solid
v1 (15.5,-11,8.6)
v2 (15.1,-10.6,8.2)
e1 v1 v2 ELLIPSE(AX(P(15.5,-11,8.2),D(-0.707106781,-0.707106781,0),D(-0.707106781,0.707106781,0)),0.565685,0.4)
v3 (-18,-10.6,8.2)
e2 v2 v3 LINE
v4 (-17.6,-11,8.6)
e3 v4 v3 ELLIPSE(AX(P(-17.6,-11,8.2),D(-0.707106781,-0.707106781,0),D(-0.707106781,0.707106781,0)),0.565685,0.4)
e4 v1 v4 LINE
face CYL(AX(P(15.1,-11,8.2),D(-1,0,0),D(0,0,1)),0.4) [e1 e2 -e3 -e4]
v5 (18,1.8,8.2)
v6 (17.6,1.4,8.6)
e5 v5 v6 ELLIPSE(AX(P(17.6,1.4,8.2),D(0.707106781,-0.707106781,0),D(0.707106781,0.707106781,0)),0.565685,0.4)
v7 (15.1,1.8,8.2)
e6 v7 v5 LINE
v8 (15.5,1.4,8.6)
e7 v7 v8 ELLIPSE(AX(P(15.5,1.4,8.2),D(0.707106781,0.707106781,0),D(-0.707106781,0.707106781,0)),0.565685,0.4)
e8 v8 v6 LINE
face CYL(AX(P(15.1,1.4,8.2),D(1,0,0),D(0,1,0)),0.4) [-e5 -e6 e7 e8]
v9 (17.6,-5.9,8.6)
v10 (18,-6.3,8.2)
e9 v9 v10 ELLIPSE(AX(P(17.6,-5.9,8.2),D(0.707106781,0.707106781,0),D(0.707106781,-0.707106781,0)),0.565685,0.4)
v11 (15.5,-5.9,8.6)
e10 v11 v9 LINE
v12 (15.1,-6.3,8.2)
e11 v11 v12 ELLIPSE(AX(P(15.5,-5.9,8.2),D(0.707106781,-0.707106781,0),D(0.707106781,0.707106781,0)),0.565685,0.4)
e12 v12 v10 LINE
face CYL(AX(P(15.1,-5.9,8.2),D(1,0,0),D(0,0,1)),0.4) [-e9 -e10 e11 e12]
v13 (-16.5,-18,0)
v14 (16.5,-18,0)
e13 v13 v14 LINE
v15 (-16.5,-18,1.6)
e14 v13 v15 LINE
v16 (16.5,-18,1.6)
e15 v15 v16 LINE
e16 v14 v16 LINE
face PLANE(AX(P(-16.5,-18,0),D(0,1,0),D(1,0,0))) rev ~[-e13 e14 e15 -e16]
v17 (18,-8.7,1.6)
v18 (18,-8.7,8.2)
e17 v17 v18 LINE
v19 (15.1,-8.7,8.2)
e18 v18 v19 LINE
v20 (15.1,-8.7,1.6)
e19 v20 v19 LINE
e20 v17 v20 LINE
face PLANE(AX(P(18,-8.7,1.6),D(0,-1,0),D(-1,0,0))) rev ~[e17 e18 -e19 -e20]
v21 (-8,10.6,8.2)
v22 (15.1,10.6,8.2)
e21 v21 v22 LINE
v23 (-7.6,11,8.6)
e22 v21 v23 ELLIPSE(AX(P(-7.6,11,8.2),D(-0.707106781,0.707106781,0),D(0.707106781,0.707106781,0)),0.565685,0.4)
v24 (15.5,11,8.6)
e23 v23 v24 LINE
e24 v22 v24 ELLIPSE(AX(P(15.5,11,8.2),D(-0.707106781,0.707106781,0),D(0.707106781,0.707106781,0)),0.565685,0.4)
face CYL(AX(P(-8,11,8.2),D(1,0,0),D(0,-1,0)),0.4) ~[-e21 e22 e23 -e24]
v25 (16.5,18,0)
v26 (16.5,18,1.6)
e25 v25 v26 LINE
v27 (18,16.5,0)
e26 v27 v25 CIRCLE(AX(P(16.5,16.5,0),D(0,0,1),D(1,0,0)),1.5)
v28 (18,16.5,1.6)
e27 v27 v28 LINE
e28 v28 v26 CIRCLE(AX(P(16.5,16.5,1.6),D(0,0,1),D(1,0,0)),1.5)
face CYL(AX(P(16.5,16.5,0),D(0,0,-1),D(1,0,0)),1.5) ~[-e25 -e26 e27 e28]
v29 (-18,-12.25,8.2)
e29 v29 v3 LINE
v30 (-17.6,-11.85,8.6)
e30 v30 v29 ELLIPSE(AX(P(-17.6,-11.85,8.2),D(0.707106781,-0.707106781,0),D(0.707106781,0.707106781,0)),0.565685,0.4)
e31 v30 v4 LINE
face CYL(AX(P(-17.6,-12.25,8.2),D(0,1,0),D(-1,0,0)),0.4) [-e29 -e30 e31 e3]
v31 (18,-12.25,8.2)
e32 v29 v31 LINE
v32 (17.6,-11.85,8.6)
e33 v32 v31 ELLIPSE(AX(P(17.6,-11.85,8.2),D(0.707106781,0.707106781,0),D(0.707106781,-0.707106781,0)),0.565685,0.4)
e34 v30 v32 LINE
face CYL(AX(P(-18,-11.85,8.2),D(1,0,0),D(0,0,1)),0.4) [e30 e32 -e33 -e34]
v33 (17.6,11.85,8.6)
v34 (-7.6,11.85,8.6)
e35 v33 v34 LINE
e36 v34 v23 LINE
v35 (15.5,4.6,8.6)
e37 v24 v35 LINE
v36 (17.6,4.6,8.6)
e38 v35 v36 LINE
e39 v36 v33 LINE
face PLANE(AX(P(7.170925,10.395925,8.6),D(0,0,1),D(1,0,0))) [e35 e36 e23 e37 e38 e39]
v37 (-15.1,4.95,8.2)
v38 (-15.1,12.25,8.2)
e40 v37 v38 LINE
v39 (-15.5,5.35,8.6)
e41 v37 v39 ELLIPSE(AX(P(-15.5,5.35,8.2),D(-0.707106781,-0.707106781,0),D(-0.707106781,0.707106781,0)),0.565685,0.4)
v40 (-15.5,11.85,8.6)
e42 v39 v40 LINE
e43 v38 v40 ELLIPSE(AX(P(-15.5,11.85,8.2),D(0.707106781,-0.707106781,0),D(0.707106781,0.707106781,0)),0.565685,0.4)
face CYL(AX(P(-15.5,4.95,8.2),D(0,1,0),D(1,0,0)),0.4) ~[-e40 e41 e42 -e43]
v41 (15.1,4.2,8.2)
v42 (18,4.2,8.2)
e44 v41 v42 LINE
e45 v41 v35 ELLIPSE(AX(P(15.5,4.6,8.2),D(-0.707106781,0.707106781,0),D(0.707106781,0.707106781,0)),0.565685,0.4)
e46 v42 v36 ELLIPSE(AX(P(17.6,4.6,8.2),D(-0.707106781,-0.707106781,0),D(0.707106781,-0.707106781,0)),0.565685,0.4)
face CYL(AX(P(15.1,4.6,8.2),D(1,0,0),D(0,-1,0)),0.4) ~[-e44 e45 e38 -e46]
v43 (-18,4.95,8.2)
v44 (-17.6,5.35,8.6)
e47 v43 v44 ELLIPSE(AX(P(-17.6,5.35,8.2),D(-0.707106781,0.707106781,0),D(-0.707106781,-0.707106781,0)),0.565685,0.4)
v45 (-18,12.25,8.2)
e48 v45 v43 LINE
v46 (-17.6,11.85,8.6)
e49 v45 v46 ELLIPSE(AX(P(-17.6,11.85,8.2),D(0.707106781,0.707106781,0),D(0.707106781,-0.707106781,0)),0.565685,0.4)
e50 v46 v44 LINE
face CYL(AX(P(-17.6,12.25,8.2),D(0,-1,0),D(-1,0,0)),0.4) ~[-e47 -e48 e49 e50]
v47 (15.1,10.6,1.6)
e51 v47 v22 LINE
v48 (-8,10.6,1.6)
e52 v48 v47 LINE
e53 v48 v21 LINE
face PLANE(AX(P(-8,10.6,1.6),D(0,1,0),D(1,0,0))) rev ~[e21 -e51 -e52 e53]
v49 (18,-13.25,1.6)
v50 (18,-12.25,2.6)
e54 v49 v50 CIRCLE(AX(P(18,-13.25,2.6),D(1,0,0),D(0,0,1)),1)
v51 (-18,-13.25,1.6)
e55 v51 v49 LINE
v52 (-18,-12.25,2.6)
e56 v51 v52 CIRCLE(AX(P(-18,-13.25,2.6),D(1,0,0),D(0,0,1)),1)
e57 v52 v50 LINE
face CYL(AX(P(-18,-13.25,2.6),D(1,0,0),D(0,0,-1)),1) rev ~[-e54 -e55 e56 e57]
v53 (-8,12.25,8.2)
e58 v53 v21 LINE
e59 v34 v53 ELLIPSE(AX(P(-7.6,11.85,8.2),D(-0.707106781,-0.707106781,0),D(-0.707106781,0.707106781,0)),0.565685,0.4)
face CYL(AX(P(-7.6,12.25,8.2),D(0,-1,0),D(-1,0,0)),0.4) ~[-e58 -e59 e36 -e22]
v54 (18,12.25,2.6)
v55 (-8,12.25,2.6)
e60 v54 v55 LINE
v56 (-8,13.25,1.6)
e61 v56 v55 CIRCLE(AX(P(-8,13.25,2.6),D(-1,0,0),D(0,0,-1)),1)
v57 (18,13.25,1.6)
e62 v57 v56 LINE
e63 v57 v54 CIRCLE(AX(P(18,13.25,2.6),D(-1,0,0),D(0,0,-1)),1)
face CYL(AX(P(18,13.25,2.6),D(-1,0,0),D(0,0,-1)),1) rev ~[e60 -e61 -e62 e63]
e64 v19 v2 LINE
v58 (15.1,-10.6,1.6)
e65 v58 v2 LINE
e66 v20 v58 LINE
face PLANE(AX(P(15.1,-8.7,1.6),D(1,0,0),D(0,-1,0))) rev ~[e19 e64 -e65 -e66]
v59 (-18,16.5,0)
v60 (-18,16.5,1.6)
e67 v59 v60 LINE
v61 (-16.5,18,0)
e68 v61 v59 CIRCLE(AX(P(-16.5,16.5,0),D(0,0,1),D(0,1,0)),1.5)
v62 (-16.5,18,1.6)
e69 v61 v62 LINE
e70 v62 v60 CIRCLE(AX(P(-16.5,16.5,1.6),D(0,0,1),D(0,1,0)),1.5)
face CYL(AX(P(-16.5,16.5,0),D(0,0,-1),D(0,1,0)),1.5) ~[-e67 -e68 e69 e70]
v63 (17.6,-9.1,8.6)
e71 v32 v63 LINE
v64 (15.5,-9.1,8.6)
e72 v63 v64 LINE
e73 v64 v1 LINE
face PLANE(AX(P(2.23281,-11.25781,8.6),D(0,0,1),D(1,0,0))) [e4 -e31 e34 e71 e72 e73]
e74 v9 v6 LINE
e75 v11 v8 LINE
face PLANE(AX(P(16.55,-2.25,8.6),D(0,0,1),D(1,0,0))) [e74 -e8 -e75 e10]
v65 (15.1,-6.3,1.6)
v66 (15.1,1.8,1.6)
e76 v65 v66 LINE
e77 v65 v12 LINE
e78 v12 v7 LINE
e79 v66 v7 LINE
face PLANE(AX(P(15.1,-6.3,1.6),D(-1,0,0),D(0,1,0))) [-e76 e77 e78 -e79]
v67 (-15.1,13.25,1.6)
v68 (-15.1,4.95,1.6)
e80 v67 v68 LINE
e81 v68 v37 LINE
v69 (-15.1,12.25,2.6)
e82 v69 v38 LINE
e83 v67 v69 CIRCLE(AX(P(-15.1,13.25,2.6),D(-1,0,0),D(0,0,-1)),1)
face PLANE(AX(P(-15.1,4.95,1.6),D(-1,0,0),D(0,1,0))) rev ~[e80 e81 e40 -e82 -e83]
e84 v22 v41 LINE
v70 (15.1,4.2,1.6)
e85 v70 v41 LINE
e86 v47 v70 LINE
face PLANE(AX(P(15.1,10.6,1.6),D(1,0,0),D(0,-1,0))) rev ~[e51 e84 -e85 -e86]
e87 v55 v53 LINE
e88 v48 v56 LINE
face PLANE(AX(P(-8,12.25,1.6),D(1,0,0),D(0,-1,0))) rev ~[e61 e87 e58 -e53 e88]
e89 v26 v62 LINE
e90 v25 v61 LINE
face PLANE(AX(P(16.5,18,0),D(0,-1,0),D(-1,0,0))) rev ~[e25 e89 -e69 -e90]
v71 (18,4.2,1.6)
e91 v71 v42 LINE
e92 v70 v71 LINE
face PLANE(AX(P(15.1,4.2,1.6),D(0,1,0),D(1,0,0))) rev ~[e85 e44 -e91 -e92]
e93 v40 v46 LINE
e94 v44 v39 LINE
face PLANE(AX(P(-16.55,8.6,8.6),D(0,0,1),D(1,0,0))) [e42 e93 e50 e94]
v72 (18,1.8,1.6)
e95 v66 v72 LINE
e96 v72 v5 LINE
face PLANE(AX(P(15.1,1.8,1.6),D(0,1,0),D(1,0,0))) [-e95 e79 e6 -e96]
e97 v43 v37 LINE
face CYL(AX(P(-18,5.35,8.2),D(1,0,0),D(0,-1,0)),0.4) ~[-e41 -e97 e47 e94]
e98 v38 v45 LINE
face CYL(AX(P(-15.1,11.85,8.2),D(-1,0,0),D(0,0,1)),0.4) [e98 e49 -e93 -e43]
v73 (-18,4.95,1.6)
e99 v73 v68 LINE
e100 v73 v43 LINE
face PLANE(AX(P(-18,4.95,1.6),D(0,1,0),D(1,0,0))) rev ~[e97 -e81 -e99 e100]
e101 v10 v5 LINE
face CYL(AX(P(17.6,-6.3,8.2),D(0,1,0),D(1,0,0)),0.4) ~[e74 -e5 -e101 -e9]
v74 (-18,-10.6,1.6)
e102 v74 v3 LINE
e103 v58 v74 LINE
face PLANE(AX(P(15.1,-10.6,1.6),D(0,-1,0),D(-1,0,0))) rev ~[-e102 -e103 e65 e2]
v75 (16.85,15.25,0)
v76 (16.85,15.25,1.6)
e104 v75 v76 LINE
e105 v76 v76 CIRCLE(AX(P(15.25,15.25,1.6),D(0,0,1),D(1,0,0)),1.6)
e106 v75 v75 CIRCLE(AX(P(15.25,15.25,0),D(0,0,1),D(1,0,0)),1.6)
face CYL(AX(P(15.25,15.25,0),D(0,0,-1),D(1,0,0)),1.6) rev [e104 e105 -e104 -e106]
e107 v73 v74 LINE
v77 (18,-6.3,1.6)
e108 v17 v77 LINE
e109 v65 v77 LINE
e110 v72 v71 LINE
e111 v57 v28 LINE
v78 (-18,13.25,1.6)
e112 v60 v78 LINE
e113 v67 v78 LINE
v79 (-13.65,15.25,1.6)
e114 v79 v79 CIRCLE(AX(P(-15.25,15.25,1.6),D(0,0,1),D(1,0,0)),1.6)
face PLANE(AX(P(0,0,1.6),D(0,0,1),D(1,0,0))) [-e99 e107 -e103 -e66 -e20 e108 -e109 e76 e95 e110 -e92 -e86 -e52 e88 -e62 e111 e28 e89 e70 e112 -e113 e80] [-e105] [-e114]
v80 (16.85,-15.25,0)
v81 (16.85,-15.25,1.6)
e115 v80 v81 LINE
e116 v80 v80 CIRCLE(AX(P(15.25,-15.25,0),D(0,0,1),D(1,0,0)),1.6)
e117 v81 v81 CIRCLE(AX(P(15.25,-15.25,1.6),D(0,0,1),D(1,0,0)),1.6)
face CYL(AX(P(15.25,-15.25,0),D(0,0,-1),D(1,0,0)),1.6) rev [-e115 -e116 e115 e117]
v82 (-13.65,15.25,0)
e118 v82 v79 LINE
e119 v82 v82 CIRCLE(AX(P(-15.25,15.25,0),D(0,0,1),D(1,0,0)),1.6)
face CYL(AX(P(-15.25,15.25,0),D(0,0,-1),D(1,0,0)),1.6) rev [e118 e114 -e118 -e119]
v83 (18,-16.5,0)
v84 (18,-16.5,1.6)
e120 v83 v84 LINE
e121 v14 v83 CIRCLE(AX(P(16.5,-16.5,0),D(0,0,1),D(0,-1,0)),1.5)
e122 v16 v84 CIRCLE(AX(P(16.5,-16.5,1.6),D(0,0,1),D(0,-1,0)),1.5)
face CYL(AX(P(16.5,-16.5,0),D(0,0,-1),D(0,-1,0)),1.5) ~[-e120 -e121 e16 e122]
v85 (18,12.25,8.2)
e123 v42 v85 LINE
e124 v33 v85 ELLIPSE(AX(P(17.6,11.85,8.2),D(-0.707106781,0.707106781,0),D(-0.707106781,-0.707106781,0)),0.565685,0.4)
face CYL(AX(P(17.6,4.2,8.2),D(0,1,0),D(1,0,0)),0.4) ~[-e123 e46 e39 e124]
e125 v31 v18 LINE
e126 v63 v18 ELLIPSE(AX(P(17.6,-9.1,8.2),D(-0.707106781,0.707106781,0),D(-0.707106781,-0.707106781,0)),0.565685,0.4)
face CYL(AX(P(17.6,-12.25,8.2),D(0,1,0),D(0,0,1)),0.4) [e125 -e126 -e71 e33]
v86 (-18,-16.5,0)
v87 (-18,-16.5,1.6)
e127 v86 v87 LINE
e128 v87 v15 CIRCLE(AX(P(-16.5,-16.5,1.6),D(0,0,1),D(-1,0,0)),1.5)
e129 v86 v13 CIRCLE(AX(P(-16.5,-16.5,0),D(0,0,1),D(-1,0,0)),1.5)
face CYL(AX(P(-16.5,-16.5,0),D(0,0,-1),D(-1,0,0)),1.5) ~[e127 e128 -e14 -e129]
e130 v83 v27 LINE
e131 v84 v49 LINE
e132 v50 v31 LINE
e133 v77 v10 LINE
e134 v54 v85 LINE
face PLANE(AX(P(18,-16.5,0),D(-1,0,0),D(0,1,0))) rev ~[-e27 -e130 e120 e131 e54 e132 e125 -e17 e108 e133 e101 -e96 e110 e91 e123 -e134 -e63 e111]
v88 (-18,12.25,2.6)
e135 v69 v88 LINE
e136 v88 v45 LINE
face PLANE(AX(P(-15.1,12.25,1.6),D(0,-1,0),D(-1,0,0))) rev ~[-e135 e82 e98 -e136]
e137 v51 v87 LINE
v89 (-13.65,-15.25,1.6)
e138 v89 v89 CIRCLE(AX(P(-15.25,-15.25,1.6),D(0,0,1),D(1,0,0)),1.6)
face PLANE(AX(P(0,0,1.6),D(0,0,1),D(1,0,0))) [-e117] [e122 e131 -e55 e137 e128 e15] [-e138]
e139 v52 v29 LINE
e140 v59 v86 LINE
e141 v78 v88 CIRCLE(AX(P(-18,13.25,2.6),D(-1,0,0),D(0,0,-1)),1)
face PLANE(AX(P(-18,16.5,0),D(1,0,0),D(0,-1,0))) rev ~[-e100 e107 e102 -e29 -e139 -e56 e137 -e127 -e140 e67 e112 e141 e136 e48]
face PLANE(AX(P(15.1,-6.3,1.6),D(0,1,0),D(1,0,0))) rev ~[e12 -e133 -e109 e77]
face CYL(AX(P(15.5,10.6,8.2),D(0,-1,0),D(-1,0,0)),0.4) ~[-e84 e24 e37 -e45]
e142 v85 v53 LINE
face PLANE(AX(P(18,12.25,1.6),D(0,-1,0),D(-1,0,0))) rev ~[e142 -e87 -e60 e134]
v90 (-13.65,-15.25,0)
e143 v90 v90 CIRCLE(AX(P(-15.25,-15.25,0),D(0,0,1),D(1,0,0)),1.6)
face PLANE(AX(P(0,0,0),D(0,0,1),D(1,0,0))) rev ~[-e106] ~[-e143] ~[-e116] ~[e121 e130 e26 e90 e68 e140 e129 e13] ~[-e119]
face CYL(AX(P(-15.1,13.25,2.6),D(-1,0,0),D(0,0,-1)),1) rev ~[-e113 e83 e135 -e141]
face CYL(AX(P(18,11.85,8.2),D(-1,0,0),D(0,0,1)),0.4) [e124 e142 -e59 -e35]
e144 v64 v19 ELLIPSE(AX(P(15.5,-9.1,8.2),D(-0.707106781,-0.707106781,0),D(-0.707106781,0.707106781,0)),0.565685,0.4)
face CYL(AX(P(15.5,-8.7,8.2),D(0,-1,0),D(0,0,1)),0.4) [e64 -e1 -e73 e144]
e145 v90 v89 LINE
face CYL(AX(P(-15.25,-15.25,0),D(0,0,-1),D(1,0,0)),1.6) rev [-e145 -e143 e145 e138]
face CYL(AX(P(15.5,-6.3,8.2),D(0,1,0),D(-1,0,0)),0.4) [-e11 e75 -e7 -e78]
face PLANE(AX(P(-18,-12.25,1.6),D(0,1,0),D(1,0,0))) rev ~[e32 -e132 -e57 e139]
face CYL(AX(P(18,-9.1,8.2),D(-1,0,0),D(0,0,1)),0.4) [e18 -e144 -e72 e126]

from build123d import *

# Parameters (mm, degrees)
F0_R     = 1.6
F1_DEPTH = 1.6
F2_W     = 2.9
F2_H     = 8.1
F2_H_2   = 1.65
F3_DEPTH = 7
F4_R     = 1
F5_R     = 0.4


with BuildPart() as f1:
    # F0 (on Top) → F1 (new body)
    with BuildSketch(Plane.XY):
        with BuildLine():
            ThreePointArc((-18, -16.5), (-17.5606601718, -17.5606601718), (-16.5, -18))
            Line((-16.5, -18), (16.5, -18))
            ThreePointArc((16.5, -18), (17.5606601718, -17.5606601718), (18, -16.5))
            Line((18, -16.5), (18, 16.5))
            ThreePointArc((18, 16.5), (17.5606601718, 17.5606601718), (16.5, 18))
            Line((16.5, 18), (-16.5, 18))
            ThreePointArc((-16.5, 18), (-17.5606601718, 17.5606601718), (-18, 16.5))
            Line((-18, 16.5), (-18, -16.5))
        make_face()
        with Locations((-15.25, -15.25)):
            Circle(F0_R, mode=Mode.SUBTRACT)
        with Locations((15.25, -15.25)):
            Circle(F0_R, mode=Mode.SUBTRACT)
        with Locations((-15.25, 15.25)):
            Circle(F0_R, mode=Mode.SUBTRACT)
        with Locations((15.25, 15.25)):
            Circle(F0_R, mode=Mode.SUBTRACT)
    extrude(amount=F1_DEPTH)

    # F2 (on face) → F3 (join)
    with BuildSketch(Plane.XY.offset(1.6)):
        Polygon((15.1, -10.6), (-15.1, -10.6), (-15.1, -12.25), (18, -12.25), (18, -8.7), (15.1, -8.7), align=None)
        with Locations((16.55, -2.25)):
            Rectangle(F2_W, F2_H)
        Polygon((-8, 12.25), (-8, 10.6), (15.1, 10.6), (15.1, 4.2), (18, 4.2), (18, 12.25), align=None)
        Polygon((-18, 4.95), (-15.1, 4.95), (-15.1, 10.6), (-15.1, 12.25), (-18, 12.25), align=None)
        with Locations((-16.55, -11.425)):
            Rectangle(F2_W, F2_H_2)
    extrude(amount=F3_DEPTH)

    # F4
    f4_edges = [f1.edges().sort_by_distance(p)[0] for p in [
        (0, -12.25, 1.6),
        (5, 12.25, 1.6),
        (-16.55, 12.25, 1.6),
    ]]
    fillet(f4_edges, radius=F4_R)

    # F5
    f5_edges = [f1.edges().sort_by_distance(p)[0] for p in [
        (5, 12.25, 8.6),
        (3.55, 10.6, 8.6),
        (-15.1, 8.6, 8.6),
        (-18, 8.6, 8.6),
        (-16.55, 12.25, 8.6),
        (-8, 11.425, 8.6),
        (-16.55, 4.95, 8.6),
        (-1.45, -10.6, 8.6),
        (0, -12.25, 8.6),
        (16.55, -8.7, 8.6),
        (18, -10.475, 8.6),
        (15.1, -9.65, 8.6),
        (16.55, -6.3, 8.6),
        (15.1, -2.25, 8.6),
        (18, -2.25, 8.6),
        (16.55, 1.8, 8.6),
        (16.55, 4.2, 8.6),
        (15.1, 7.4, 8.6),
        (18, 8.225, 8.6),
        (-18, -11.425, 8.6),
    ]]
    fillet(f5_edges, radius=F5_R)


solid = f1.part
